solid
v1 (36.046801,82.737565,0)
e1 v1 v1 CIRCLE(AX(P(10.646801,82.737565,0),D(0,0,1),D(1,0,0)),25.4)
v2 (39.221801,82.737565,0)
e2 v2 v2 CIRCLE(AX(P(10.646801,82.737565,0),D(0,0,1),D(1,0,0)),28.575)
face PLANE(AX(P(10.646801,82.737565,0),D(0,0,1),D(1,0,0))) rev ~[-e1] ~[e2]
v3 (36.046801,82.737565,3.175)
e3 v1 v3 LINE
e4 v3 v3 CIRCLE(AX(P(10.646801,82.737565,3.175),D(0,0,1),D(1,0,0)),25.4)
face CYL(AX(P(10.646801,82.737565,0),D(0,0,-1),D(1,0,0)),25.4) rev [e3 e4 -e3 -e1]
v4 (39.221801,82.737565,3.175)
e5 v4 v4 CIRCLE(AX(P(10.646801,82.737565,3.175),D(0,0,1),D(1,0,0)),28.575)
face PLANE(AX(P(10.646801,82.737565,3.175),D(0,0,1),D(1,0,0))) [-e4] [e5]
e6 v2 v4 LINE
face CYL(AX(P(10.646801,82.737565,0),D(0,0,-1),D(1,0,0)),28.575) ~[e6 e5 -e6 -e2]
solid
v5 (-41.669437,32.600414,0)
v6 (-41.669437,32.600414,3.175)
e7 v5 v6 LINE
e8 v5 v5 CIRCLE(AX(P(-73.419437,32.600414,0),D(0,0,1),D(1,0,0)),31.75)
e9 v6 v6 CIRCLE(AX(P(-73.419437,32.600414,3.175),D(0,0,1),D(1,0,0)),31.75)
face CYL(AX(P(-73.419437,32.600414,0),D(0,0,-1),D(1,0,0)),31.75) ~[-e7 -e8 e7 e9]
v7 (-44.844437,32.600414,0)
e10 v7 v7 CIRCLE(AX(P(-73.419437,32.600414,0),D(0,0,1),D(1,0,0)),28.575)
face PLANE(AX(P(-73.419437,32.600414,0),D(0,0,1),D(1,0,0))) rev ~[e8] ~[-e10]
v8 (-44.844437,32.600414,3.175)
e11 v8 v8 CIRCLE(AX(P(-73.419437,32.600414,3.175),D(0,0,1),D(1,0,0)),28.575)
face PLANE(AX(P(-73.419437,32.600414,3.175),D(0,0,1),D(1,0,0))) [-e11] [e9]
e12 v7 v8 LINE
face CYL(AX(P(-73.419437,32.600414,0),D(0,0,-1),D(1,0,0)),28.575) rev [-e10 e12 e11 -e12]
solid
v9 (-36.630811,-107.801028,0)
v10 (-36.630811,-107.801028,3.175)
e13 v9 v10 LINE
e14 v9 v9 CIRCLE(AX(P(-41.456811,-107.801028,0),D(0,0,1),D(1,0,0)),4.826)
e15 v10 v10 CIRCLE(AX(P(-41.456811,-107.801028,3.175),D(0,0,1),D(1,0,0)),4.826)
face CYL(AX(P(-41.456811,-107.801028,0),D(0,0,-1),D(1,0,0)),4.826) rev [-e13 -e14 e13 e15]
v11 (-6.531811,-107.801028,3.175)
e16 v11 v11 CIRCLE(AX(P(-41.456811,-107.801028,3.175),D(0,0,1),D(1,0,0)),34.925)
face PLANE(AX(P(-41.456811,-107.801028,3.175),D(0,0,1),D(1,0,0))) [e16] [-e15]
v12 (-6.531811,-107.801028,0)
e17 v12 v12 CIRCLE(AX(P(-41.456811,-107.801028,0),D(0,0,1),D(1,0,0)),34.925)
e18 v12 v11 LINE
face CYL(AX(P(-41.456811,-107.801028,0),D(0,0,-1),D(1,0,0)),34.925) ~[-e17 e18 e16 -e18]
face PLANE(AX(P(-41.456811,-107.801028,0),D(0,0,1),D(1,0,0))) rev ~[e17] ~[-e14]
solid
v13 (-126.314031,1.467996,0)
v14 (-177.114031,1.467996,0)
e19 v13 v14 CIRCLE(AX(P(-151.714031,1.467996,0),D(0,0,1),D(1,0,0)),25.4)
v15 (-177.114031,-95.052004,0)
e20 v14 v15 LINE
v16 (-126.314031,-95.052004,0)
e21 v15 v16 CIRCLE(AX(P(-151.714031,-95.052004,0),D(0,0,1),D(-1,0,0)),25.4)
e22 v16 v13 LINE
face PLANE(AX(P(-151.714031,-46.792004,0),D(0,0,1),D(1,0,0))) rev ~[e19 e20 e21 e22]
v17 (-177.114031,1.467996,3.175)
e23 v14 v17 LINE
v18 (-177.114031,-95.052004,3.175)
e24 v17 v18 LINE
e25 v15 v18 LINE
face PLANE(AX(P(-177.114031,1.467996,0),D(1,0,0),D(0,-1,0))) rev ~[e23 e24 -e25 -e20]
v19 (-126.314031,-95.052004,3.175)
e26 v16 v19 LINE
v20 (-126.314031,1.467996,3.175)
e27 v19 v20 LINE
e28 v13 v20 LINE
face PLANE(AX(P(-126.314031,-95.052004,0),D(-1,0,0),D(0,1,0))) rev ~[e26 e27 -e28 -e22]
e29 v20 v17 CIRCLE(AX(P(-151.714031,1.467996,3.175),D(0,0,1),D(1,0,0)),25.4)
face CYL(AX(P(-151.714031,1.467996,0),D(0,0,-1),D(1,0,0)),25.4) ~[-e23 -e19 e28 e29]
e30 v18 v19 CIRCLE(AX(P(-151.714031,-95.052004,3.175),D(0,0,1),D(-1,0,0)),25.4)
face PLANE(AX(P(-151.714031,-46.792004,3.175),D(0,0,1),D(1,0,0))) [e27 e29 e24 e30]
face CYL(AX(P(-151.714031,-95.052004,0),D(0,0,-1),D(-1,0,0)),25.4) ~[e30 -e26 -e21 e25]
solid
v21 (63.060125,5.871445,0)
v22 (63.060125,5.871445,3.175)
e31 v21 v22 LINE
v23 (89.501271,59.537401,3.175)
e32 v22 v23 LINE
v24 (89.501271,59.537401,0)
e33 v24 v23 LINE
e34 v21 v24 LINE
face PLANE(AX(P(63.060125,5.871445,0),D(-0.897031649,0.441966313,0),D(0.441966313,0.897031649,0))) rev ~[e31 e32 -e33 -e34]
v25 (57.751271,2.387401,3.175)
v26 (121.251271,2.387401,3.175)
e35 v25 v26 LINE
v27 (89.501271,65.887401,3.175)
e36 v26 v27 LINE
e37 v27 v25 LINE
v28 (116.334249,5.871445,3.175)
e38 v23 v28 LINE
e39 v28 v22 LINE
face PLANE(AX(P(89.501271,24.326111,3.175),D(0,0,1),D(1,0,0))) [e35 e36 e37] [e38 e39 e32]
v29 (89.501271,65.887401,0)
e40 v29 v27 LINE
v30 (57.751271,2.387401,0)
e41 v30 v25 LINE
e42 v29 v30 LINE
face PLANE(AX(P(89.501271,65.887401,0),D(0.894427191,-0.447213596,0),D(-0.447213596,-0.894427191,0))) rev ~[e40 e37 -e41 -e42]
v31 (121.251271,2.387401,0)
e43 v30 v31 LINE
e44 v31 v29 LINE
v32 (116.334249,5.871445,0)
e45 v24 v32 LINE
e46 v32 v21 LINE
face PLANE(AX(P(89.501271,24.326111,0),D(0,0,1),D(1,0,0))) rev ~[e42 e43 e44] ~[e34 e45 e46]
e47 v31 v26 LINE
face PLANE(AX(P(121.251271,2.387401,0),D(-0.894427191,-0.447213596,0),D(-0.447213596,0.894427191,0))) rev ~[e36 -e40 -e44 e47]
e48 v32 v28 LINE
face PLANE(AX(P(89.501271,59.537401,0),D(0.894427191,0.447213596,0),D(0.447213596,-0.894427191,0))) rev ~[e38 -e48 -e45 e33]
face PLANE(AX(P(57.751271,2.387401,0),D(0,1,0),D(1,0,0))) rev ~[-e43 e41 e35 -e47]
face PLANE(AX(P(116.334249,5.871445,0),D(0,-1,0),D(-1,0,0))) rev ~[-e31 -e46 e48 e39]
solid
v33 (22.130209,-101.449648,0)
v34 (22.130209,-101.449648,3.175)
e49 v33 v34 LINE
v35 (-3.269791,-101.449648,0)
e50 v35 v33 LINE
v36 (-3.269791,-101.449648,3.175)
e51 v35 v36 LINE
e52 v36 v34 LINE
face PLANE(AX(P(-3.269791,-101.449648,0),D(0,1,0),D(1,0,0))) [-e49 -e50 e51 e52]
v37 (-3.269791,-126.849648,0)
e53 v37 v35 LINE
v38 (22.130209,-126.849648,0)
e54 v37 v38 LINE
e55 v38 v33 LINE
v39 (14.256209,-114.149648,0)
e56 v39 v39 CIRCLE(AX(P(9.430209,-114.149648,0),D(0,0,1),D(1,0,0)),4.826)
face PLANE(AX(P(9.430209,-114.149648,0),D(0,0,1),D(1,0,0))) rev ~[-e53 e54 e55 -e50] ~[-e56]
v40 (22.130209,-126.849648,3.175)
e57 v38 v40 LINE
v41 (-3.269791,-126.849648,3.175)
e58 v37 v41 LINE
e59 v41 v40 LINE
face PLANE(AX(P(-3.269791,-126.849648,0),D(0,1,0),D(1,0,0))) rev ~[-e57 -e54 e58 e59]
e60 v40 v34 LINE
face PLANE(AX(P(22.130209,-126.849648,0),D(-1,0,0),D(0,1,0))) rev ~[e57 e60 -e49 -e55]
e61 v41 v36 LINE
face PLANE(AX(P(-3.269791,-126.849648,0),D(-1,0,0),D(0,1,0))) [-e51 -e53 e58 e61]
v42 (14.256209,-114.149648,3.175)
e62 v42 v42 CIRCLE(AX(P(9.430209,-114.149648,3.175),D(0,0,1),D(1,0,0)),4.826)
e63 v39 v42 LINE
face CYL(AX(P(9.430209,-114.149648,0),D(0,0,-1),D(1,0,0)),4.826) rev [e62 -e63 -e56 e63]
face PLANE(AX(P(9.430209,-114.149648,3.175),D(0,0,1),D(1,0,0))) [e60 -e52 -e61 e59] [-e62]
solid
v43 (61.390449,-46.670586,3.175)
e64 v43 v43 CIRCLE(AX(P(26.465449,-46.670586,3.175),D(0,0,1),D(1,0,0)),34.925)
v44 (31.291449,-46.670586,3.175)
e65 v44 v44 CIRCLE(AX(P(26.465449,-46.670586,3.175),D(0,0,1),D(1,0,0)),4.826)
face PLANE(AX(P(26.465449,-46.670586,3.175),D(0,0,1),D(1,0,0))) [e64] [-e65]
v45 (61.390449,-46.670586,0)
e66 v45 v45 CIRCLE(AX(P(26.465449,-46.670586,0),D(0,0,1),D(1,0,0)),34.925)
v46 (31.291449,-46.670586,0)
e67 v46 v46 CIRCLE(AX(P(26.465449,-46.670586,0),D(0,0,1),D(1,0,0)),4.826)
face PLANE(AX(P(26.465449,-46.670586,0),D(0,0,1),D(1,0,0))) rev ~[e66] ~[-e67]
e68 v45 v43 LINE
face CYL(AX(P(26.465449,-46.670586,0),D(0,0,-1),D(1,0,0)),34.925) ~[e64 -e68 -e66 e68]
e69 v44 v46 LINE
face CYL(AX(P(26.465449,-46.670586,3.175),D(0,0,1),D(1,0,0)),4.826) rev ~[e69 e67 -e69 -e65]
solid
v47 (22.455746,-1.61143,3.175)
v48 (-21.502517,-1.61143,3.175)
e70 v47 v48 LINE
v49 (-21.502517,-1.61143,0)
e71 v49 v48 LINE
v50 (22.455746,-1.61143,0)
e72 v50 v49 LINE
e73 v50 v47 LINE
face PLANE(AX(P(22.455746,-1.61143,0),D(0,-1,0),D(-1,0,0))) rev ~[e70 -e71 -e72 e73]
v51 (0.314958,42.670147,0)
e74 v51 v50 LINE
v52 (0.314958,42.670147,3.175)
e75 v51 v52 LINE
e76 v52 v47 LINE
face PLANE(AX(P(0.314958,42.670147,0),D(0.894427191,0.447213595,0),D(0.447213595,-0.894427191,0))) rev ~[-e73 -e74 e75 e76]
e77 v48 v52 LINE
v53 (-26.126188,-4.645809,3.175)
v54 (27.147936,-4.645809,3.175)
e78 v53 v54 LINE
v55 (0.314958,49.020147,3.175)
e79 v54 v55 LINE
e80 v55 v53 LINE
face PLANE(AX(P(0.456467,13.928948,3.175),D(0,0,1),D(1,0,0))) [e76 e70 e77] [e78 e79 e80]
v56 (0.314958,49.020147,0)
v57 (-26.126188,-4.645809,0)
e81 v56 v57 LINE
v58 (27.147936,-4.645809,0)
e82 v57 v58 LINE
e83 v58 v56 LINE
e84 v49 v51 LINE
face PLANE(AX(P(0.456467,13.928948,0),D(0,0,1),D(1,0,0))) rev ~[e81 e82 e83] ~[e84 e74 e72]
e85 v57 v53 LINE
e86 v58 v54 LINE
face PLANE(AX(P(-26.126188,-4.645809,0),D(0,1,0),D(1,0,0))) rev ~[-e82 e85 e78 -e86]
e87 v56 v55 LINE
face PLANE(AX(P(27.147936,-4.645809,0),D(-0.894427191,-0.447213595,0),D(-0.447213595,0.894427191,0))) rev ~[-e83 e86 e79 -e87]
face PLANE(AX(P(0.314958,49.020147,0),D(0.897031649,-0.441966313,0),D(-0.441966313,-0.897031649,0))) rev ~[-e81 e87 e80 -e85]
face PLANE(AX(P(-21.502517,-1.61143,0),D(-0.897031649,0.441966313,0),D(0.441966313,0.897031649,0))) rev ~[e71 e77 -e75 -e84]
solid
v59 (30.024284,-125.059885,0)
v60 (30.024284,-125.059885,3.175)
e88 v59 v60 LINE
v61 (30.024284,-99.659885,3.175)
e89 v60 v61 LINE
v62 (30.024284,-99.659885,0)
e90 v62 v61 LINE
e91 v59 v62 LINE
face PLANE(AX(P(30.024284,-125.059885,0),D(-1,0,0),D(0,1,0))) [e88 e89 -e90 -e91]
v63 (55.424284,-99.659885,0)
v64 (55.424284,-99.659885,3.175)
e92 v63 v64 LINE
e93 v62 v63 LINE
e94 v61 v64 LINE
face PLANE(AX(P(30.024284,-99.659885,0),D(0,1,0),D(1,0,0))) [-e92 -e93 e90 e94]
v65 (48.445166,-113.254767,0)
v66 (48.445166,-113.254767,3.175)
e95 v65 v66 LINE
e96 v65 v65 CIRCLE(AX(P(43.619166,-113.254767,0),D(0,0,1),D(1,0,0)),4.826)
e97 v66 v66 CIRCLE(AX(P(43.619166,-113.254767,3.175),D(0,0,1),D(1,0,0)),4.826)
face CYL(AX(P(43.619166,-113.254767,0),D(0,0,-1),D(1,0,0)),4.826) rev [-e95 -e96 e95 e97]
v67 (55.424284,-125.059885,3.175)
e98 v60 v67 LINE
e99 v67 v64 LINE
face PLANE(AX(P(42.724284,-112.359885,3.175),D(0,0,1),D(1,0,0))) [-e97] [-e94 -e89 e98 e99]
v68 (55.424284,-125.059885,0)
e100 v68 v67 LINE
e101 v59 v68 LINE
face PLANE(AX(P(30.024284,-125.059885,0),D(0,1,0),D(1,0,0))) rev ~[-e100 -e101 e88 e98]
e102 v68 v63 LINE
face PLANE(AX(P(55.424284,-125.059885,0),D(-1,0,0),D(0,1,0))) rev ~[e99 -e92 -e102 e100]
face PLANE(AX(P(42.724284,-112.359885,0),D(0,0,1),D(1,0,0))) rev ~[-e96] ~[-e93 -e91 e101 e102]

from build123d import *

# Parameters (mm, degrees)
F1_R      = 34.925
F1_R_2    = 4.826
F2_DEPTH  = 3.175
F3_R      = 34.925
F4_DEPTH  = 3.175
F5_R      = 4.826
F6_DEPTH  = 25.4
F7_W      = 25.4
F7_H      = 25.4
F7_R      = 4.826
F8_DEPTH  = 3.175
F0_R      = 31.75
F0_R_2    = 28.575
F9_DEPTH  = 3.175
F11_DEPTH = 3.175
F13_DEPTH = 3.175
F14_R     = 28.575
F14_R_2   = 25.4
F15_DEPTH = 3.175


# Not quite as in the source:
# - a feature names something its author has since deleted; it is built from what else it names


with BuildPart() as f2:
    # F1 (on Top) → F2 (new body)
    with BuildSketch(Plane.XY):
        with Locations((-41.45681113, -107.801027596)):
            Circle(F1_R)
        with Locations((-41.45681113, -107.801027596)):
            Circle(F1_R_2, mode=Mode.SUBTRACT)
    extrude(amount=F2_DEPTH)


with BuildPart() as f4:
    # F3 (on Top) → F4 (new body)
    with BuildSketch(Plane.XY):
        with Locations((26.4654487837, -46.6705858707)):
            Circle(F3_R)
    extrude(amount=F4_DEPTH)

    # F5 (on face) → F6 (cut)
    with BuildSketch(Plane.XY.offset(3.175)):
        with Locations((26.4654487837, -46.6705858707)):
            Circle(F5_R)
    extrude(amount=-F6_DEPTH, mode=Mode.SUBTRACT)


with BuildPart() as f8:
    # F7 (on Top) → F8 (new body)
    with BuildSketch(Plane.XY):
        with Locations((9.4302088464, -114.1496481273)):
            Rectangle(F7_W, F7_H)
        with Locations((9.4302088464, -114.1496481273)):
            Circle(F7_R, mode=Mode.SUBTRACT)
    extrude(amount=F8_DEPTH)


with BuildPart() as f8b:
    # F7 (on Top) → F8, piece 2 (new body)
    with BuildSketch(Plane.XY):
        with Locations((42.7242840971, -112.3598849141)):
            Rectangle(F7_W, F7_H)
        with Locations((43.6191657037, -113.2547665207)):
            Circle(F7_R, mode=Mode.SUBTRACT)
    extrude(amount=F8_DEPTH)


with BuildPart() as f9:
    # F0 (on Top) → F9 (new body)
    with BuildSketch(Plane.XY):
        with Locations((-73.4194368124, 32.6004140079)):
            Circle(F0_R)
        with Locations((-73.4194368124, 32.6004140079)):
            Circle(F0_R_2, mode=Mode.SUBTRACT)
    extrude(amount=F9_DEPTH)


with BuildPart() as f9b:
    # F0 (on Top) → F9, piece 2 (new body)
    with BuildSketch(Plane.XY):
        Polygon((89.5012710243, 65.8874005459), (57.7512710243, 2.3874005459), (121.2512710243, 2.3874005459), align=None)
        Polygon((116.3342488013, 5.871444992), (63.0601253544, 5.871444992), (89.5012710243, 59.5374005459), align=None, mode=Mode.SUBTRACT)
    extrude(amount=F9_DEPTH)


with BuildPart() as f11:
    # F10 (on Top) → F11 (new body)
    with BuildSketch(Plane.XY):
        with BuildLine():
            Line((-126.3140311956, -95.0520038605), (-126.3140311956, 1.4679961395))
            ThreePointArc((-126.3140311956, 1.4679961395), (-151.7140311956, 26.8679961395), (-177.1140311956, 1.4679961395))
            Line((-177.1140311956, 1.4679961395), (-177.1140311956, -95.0520038605))
            ThreePointArc((-177.1140311956, -95.0520038605), (-151.7140311956, -120.4520038605), (-126.3140311956, -95.0520038605))
        make_face()
    extrude(amount=F11_DEPTH)


with BuildPart() as f13:
    # F12 (on Top) → F13 (new body)
    with BuildSketch(Plane.XY):
        Polygon((0.3149577829, 49.0201465513), (-26.1261878871, -4.6458090026), (27.1479355598, -4.6458090026), align=None)
        Polygon((-21.5025167309, -1.6114300556), (0.3149577829, 42.6701465513), (22.4557460863, -1.6114300556), align=None, mode=Mode.SUBTRACT)
    extrude(amount=F13_DEPTH)


with BuildPart() as f15:
    # F14 (on Top) → F15 (new body)
    with BuildSketch(Plane.XY):
        with Locations((10.6468005106, 82.7375650406)):
            Circle(F14_R)
        with Locations((10.6468005106, 82.7375650406)):
            Circle(F14_R_2, mode=Mode.SUBTRACT)
    extrude(amount=F15_DEPTH)


solid = Compound([f2.part, f4.part, f8.part, f8b.part, f9.part, f9b.part, f11.part, f13.part, f15.part])
